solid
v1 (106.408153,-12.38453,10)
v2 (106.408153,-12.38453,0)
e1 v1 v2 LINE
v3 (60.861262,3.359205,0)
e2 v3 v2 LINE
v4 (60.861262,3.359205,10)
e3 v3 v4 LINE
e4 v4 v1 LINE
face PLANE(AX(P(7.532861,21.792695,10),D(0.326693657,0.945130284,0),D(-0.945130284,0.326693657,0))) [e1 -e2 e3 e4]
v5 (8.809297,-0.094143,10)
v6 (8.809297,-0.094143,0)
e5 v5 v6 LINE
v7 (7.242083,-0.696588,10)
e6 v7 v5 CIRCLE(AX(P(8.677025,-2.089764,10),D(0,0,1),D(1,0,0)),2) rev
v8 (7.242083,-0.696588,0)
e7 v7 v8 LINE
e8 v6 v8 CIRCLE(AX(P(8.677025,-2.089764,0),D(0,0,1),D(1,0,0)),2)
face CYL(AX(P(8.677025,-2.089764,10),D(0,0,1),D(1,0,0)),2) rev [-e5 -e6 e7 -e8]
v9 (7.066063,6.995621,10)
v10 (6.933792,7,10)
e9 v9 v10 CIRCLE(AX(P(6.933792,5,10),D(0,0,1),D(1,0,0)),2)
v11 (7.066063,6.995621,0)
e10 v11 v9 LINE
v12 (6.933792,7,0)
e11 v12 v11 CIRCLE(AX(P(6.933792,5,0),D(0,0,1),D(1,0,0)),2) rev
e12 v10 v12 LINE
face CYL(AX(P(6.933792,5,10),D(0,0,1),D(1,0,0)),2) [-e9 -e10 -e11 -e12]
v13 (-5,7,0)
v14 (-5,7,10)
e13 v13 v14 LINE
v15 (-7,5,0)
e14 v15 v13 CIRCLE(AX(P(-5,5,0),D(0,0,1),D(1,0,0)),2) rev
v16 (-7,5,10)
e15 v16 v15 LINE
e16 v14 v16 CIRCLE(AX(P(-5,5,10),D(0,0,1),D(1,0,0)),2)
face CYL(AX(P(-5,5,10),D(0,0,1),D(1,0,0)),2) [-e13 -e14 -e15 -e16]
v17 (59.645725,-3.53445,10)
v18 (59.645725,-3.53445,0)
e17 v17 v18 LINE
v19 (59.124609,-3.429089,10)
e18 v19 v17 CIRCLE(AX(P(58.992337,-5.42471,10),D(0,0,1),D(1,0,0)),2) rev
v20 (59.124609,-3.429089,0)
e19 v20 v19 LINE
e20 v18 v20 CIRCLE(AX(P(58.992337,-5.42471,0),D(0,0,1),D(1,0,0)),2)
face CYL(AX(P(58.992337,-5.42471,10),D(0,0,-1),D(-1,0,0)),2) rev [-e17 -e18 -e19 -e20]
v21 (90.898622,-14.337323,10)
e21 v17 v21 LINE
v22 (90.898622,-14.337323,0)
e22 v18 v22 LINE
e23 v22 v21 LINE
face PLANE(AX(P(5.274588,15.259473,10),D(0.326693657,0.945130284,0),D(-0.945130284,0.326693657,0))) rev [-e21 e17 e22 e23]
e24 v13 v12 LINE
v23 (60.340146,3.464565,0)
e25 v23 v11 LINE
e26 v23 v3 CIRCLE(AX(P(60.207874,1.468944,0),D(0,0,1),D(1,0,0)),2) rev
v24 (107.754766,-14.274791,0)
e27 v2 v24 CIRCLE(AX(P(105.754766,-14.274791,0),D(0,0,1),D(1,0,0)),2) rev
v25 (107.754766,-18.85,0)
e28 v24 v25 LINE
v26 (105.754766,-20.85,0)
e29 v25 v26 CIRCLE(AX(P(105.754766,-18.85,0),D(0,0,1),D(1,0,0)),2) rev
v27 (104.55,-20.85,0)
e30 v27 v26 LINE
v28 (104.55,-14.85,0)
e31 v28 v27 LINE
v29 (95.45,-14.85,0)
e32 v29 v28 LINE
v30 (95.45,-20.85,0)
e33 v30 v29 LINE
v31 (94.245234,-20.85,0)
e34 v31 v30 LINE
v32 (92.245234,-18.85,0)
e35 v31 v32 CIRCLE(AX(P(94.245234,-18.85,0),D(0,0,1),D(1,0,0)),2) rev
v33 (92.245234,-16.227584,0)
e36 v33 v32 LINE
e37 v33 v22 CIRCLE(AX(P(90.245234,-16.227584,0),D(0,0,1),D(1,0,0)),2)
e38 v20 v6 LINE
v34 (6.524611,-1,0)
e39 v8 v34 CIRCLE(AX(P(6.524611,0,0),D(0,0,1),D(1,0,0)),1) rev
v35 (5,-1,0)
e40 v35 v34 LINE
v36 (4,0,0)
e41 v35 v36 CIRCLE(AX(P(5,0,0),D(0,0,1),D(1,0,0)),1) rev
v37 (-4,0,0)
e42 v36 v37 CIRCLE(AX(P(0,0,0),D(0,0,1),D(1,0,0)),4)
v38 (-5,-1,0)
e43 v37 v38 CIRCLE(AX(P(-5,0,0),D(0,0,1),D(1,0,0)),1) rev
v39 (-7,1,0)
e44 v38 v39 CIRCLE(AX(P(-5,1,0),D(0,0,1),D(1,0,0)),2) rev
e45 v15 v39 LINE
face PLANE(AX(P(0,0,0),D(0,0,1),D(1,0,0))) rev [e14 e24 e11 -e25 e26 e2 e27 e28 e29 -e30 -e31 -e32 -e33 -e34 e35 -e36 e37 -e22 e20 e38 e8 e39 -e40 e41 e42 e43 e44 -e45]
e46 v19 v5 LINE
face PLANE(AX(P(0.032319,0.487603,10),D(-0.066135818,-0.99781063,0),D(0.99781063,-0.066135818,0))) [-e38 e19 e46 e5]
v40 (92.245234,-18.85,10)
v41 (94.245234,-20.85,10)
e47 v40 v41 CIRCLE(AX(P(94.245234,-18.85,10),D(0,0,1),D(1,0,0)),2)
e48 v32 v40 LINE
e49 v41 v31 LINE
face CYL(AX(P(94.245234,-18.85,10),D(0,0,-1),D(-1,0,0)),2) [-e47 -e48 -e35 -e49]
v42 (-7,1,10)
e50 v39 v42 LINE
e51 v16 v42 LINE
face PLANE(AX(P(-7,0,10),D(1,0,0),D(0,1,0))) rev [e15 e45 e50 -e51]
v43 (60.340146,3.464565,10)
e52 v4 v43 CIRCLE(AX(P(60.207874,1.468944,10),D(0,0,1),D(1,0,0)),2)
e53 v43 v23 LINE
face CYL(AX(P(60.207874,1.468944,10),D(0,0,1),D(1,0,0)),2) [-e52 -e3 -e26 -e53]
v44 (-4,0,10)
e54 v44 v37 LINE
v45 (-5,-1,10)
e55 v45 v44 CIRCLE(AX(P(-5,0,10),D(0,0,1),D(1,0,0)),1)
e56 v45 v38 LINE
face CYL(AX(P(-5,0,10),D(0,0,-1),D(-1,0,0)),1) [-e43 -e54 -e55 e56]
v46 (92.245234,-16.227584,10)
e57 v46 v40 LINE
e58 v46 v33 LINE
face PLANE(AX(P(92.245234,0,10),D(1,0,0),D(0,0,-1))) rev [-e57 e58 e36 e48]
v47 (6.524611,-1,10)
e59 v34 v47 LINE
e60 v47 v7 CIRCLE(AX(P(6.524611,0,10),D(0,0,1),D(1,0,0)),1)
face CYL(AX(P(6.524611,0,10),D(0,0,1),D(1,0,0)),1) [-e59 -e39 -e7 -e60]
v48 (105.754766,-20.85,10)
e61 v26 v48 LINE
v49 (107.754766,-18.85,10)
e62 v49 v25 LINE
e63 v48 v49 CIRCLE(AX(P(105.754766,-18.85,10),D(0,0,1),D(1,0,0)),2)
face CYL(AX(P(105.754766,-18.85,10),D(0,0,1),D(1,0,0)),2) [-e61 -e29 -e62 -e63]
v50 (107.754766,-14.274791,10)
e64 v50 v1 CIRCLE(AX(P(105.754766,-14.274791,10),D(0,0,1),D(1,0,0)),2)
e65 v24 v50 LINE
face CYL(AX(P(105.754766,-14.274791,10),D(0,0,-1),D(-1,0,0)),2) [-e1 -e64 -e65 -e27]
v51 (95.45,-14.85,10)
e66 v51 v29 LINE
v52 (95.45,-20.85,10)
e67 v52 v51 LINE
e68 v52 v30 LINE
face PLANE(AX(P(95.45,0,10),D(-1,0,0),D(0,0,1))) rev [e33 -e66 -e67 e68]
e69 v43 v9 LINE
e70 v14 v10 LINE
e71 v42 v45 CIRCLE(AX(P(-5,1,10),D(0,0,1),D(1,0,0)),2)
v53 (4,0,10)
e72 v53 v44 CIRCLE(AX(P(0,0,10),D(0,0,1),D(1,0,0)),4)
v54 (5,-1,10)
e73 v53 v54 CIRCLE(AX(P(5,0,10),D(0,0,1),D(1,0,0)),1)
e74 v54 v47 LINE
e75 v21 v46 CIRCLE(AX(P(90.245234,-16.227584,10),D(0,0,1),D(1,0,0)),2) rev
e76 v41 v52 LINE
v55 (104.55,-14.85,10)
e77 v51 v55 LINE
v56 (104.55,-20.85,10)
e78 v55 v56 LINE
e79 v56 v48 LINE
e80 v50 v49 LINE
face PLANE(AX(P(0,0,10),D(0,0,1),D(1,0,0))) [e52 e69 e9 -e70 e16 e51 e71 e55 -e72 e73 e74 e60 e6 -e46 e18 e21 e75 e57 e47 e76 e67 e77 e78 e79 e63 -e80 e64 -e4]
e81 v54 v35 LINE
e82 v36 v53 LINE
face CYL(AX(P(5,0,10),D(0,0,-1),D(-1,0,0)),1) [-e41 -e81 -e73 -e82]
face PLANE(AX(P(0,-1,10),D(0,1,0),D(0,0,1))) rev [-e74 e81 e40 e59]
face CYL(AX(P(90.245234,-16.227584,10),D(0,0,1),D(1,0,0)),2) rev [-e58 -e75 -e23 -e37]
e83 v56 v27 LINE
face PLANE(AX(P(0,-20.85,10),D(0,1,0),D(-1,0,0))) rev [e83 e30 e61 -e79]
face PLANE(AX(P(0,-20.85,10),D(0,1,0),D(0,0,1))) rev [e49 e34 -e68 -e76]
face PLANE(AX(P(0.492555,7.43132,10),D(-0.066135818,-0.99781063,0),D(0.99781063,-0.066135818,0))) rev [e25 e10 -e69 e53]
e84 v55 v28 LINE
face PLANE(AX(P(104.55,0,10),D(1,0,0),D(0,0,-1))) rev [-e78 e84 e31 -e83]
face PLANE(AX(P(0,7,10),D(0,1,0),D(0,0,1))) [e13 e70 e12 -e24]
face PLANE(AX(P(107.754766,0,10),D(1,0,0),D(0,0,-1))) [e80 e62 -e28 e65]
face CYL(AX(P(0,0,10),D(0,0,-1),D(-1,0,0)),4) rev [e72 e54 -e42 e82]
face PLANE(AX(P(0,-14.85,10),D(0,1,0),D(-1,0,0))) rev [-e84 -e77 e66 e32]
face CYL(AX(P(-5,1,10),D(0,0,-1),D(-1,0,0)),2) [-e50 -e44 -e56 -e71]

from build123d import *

# Parameters (mm, degrees)
EXTRUDE_1_DEPTH = 10
FILLET_1_R      = 2
FILLET_2_R      = 1


# Some blends are built 0.0001 mm under size
with BuildPart() as part:
    # Эскиз1 → Бобышка-Вытянуть1 (new body)
    with BuildSketch(Plane.XY):
        with BuildLine():
            ThreePointArc((3.872983346, -1), (0, 4), (-3.872983346, -1))
            Line((-3.872983346, -1), (-7, -1))
            Line((-7, -1), (-7, 7))
            Line((-7, 7), (7, 7))
            Line((7, 7), (7, -1))
            Line((7, -1), (3.872983346, -1))
        make_face()
        Polygon((7, 0.025778788), (59.392231378, -3.446827136), (60.607768622, 3.446827136), (7, 7), align=None)
        Polygon((59.392231378, -3.446827136), (92.245234414, -14.802793492), (92.245234414, -12.85), (107.754765586, -12.85), (60.607768622, 3.446827136), align=None)
        Polygon((104.55, -14.85), (104.55, -20.85), (107.754765586, -20.85), (107.754765586, -12.85), (92.245234414, -12.85), (92.245234414, -20.85), (95.45, -20.85), (95.45, -14.85), align=None)
    extrude(amount=EXTRUDE_1_DEPTH)

    # Скругление1
    # the kernel refuses this fillet: 2 mm, written as the material it adds along each edge
    with BuildSketch(Plane(origin=(59.392231378, -3.446827136, 0), x_dir=(0.9451302843245073, -0.32669365719688503, 0), z_dir=(0, 0, 1))) as fillet_1_piece_1:
        with BuildLine():
            CenterArc((FILLET_1_R * 0.134104869986, -FILLET_1_R), FILLET_1_R, 90, 15.276145222)
            Line((-FILLET_1_R * 0.129366569023, -FILLET_1_R * 0.0353328030732), (0, 0))
            Line((0, 0), (FILLET_1_R * 0.134104869986, 0))
        make_face()
    extrude(amount=10)
    with BuildSketch(Plane(origin=(7, 0.025778788, 0), x_dir=(0, -1, 0), z_dir=(0, 0, 1))) as fillet_1_piece_2:
        with BuildLine():
            CenterArc((2.115543143, 1.677025238), FILLET_1_R, 176.207928907, 60.775458648)
            Line((0.119921883, 1.809296875), (0, 0))
            Line((0, 0), (1.025778788, 0))
        make_face()
    extrude(amount=10)
    with BuildSketch(Plane(origin=(92.245234414, -14.802793492, 0), x_dir=(-0.945130284324508, 0.3266936571968835, 0), z_dir=(0, 0, 1))) as fillet_1_piece_3:
        with BuildLine():
            CenterArc((FILLET_1_R * 0.712395268642, FILLET_1_R), FILLET_1_R, 199.068216315, 70.931783685)
            Line((-FILLET_1_R * 0.232735015682, FILLET_1_R * 0.673306342803), (0, 0))
            Line((0, 0), (FILLET_1_R * 0.712395268642, 0))
        make_face()
    extrude(amount=10)
    # the kernel refuses this fillet: 2 mm, written as the material it takes off along each edge
    with BuildSketch(Plane(origin=(-7, -1, -5), x_dir=(1, 0, 0), z_dir=(0, 0, 1)), Plane(origin=(-7, 7, -5), x_dir=(0, -1, 0), z_dir=(0, 0, 1)), Plane(origin=(107.754765586, -20.85, -5), x_dir=(0, 1, 0), z_dir=(0, 0, 1)), Plane(origin=(92.245234414, -20.85, -5), x_dir=(1, 0, 0), z_dir=(0, 0, 1))) as fillet_1_2_piece_1:
        with BuildLine():
            CenterArc((FILLET_1_R, FILLET_1_R), FILLET_1_R, 180, 90)
            Line((0, FILLET_1_R), (0, 0))
            Line((0, 0), (FILLET_1_R, 0))
        make_face()
    extrude(amount=20, mode=Mode.SUBTRACT)
    with BuildSketch(Plane(origin=(107.754765586, -12.85, -3.561976343), x_dir=(-0.9451302843245086, 0.3266936571968812, 0), z_dir=(0, 0, 1))) as fillet_1_2_piece_2:
        with BuildLine():
            CenterArc((FILLET_1_R * 0.712395268642, FILLET_1_R), FILLET_1_R, 199.068216315, 70.931783685)
            Line((-FILLET_1_R * 0.232735015682, FILLET_1_R * 0.673306342803), (0, 0))
            Line((0, 0), (FILLET_1_R * 0.712395268642, 0))
        make_face()
    extrude(amount=17.123952686, mode=Mode.SUBTRACT)
    with BuildSketch(Plane(origin=(7, 7, -0.165520739), x_dir=(-1, 0, 0), z_dir=(0, 0, 1))) as fillet_1_2_piece_3:
        with BuildLine():
            CenterArc((FILLET_1_R * 0.0331041478527, FILLET_1_R), FILLET_1_R, 266.207928907, 3.792071093)
            Line((-FILLET_1_R * 0.0330316706273, FILLET_1_R * 0.00218936991332), (0, 0))
            Line((0, 0), (FILLET_1_R * 0.0331041478527, 0))
        make_face()
    extrude(amount=10.331041479, mode=Mode.SUBTRACT)
    with BuildSketch(Plane(origin=(60.607768622, 3.446827136, -0.67052435), x_dir=(-0.9978106300866822, 0.06613581847999181, 0), z_dir=(0, 0, 1))) as fillet_1_2_piece_4:
        with BuildLine():
            CenterArc((FILLET_1_R * 0.134104869986, FILLET_1_R), FILLET_1_R, 254.723854778, 15.276145222)
            Line((-FILLET_1_R * 0.129366569023, FILLET_1_R * 0.0353328030732), (0, 0))
            Line((0, 0), (FILLET_1_R * 0.134104869986, 0))
        make_face()
    extrude(amount=11.3410487, mode=Mode.SUBTRACT)

    # Скругление2
    fillet_2_edges = [part.edges().sort_by_distance(p)[0] for p in [
        (7, -1, 5),
        (3.872983346, -1, 5),
        (-3.872983346, -1, 5),
    ]]
    fillet(fillet_2_edges, radius=FILLET_2_R - 0.0001)  # a hair under: the kernel refuses the full size


solid = part.part
